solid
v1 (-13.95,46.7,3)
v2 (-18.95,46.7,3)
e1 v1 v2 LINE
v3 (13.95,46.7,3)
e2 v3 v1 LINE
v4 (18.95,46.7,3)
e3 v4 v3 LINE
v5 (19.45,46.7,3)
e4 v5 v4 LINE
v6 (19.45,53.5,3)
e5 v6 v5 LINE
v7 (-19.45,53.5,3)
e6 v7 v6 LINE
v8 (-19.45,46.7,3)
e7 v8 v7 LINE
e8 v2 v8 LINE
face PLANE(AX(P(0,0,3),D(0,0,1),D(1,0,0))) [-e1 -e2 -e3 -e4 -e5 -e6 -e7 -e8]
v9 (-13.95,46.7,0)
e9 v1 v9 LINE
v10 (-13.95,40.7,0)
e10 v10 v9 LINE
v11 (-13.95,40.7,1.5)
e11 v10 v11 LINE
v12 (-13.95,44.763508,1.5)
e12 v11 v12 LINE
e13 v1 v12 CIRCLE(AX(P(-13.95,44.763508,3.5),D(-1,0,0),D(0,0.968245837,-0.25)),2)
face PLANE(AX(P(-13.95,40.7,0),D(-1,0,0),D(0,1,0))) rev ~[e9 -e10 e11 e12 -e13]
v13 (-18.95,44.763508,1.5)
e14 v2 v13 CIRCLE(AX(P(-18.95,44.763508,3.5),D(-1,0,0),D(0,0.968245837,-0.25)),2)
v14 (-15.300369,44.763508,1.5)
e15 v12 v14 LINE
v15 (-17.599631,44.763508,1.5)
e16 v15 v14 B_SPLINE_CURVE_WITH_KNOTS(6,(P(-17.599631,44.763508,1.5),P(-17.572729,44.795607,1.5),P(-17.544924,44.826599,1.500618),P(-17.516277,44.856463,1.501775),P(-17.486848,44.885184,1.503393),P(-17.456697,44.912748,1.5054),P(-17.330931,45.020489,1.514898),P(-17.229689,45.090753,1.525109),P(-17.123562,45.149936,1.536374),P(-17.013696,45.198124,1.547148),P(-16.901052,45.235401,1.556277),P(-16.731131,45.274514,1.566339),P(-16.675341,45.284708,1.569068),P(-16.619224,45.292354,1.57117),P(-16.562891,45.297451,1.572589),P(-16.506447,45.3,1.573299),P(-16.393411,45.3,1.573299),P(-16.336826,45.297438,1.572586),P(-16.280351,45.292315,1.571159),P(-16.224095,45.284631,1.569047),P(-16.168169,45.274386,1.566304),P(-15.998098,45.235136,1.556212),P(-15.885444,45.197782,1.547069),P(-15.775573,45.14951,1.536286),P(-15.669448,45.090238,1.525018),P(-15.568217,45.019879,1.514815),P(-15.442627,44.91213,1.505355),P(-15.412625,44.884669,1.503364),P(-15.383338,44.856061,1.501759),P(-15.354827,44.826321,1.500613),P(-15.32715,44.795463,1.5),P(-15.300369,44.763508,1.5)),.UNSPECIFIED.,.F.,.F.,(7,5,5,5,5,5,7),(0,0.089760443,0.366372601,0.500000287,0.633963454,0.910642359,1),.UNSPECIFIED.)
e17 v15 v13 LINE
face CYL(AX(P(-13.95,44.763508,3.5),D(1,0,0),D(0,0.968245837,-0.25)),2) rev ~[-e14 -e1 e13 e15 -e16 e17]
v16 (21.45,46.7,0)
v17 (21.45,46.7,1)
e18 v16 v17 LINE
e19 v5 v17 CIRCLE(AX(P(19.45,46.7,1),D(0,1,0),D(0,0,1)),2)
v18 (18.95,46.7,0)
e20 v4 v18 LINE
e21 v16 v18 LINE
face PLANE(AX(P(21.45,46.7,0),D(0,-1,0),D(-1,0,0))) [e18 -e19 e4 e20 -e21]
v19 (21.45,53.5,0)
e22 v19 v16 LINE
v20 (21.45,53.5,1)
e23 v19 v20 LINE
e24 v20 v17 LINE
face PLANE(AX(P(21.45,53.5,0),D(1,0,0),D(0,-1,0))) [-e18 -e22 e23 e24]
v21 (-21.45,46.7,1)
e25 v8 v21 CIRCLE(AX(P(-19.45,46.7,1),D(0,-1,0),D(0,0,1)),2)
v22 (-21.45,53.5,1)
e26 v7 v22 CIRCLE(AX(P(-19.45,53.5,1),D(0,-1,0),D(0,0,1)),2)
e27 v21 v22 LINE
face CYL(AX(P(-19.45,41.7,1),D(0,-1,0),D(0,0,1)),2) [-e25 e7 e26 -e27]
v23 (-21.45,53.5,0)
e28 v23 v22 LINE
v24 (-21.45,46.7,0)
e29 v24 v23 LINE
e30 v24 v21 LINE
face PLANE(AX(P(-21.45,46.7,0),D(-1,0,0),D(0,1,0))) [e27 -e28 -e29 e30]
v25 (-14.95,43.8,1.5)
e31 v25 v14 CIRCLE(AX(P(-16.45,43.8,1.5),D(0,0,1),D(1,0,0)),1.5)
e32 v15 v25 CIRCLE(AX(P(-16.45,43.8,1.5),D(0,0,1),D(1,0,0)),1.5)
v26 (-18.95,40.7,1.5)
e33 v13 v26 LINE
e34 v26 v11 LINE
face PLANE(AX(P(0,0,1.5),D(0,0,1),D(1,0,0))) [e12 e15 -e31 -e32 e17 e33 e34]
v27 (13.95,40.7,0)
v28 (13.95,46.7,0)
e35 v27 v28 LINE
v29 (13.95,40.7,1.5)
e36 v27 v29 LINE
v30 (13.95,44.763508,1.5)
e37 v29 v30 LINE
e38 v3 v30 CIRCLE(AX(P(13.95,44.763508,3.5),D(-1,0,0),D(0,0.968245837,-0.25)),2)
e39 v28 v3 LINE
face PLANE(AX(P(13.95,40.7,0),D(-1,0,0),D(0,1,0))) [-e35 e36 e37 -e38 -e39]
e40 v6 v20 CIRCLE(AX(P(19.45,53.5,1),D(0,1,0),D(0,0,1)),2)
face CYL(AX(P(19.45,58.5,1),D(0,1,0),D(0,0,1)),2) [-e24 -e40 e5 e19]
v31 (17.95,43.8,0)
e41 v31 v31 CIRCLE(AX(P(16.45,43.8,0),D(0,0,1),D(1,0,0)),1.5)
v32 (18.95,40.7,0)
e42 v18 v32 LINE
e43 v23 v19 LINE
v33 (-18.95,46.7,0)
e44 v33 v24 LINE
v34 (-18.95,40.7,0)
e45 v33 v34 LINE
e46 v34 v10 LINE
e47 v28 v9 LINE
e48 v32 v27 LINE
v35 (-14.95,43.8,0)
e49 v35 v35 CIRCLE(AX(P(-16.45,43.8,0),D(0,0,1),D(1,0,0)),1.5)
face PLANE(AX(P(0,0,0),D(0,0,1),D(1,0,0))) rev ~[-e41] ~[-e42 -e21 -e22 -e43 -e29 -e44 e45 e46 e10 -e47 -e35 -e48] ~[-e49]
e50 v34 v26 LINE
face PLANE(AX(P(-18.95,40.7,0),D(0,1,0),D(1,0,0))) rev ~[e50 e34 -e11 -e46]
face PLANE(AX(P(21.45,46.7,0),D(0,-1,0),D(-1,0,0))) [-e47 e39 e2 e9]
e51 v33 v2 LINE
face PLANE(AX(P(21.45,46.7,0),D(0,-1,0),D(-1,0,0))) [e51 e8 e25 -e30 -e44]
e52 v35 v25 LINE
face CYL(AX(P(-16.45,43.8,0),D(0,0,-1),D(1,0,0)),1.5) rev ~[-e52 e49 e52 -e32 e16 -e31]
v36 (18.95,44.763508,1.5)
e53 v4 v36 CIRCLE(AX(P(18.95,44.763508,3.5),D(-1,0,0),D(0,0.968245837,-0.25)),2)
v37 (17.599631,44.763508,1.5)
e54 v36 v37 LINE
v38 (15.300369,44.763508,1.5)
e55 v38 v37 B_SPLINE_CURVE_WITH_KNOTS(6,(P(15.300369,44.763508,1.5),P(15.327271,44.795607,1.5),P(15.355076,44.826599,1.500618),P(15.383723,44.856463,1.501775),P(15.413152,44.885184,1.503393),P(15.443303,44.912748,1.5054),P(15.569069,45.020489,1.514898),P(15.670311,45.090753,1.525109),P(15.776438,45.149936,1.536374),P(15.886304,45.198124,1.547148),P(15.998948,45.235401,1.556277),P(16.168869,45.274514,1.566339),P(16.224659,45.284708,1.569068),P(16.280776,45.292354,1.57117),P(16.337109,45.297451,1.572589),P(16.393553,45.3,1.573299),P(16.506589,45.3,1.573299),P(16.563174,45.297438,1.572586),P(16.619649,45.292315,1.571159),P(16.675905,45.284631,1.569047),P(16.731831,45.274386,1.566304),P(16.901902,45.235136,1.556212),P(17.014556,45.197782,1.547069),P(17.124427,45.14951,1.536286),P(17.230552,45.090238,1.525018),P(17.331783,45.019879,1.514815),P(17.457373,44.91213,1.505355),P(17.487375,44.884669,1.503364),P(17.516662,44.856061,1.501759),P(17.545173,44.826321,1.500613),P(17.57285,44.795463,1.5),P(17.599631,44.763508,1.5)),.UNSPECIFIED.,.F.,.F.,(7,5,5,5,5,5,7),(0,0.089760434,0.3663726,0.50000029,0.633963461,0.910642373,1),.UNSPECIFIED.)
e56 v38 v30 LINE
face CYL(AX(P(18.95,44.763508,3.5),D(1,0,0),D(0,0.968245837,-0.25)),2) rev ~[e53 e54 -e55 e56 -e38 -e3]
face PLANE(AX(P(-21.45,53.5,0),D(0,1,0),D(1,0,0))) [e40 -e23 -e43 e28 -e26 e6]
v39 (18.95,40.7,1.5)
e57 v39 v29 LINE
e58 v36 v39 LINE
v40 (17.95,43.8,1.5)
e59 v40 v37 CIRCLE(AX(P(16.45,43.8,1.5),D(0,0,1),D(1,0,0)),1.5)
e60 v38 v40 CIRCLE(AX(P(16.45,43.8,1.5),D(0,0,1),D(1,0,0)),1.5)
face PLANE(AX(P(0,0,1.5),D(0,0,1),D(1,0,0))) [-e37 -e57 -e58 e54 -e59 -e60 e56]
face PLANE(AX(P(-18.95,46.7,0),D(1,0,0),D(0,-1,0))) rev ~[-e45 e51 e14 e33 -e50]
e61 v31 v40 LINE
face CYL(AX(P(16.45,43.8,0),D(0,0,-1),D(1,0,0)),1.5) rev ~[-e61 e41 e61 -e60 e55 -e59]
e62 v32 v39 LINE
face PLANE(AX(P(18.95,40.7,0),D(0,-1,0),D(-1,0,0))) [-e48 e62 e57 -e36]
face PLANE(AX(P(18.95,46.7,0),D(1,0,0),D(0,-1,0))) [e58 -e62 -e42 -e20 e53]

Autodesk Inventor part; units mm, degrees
ref_plane "YZ Plane" through (0, 0, 0) normal (1, 0, 0) x (0, 1, 0)
ref_plane "XZ Plane" through (0, 0, 0) normal (0, 1, 0) x (-1, 0, 0)
ref_plane "XY Plane" through (0, 0, 0) normal (0, 0, 1) x (1, 0, 0)
sketch "Эскиз1" plane through (0, 0, 0) normal (0, 0, 1) x (1, 0, 0)
  line L0 (0, 0) -> (21.45, 0) construction
  line L1 (21.45, 0) -> (21.45, 46.7) construction
  line L2 (21.45, 46.7) -> (0, 46.7) construction
  line L3 (0, 46.7) -> (0, 0) construction
  line L4 (21.45, 46.7) -> (16.45, 46.7) construction
  line L5 (16.45, 46.7) -> (16.45, 43.8) construction
  line L6 (16.45, 43.8) -> (21.45, 43.8) construction
  line L7 (21.45, 43.8) -> (21.45, 46.7) construction
  circle A0 centre (16.45, 43.8) radius 1.5
  circle A1 centre (-16.45, 43.8) radius 1.5
  line L8 (21.45, 46.7) -> (-21.45, 46.7)
  line L9 (-21.45, 46.7) -> (-21.45, 53.5)
  line L10 (-21.45, 53.5) -> (21.45, 53.5)
  line L11 (21.45, 53.5) -> (21.45, 46.7)
  line L12 (21.45, 46.7) -> (18.95, 46.7)
  line L13 (18.95, 46.7) -> (18.95, 40.7)
  line L14 (18.95, 40.7) -> (13.95, 40.7)
  line L15 (13.95, 40.7) -> (13.95, 46.7)
  line L16 (-16.45, 46.7) -> (-16.45, 43.8) construction
  line L17 (-16.45, 43.8) -> (-21.45, 43.8) construction
  line L18 (-18.95, 46.7) -> (-18.95, 40.7)
  line L19 (-18.95, 40.7) -> (-13.95, 40.7)
  line L20 (-13.95, 40.7) -> (-13.95, 46.7)
  circle A2 centre (-16.45, 43.8) radius 1.5
  dimension "d0" = 21.45
  dimension "d1" = 46.7
  dimension "d2" = 5
  dimension "d3" = 2.9
  dimension "d4" = 3
  dimension "d5" = 42.9
  dimension "d6" = 6.8
  dimension "d7" = 2.5
  dimension "d8" = 6
  dimension "d9" = 5
extrude "Выдавливание1" add sketch "Эскиз1" along normal blind 1.5 contours L13 L14 L15 L8 | L20 L19 L18 L8
extrude "Выдавливание2" add sketch "Эскиз1" along normal blind 3 contours L8 L9 L10 L11
fillet "Сопряжение1" radius 2 4 edges at (-21.45, 50.1, 3) (-16.45, 46.7, 1.5) (21.45, 50.1, 3) (16.45, 46.7, 1.5)
properties part number "wire_fixs"
